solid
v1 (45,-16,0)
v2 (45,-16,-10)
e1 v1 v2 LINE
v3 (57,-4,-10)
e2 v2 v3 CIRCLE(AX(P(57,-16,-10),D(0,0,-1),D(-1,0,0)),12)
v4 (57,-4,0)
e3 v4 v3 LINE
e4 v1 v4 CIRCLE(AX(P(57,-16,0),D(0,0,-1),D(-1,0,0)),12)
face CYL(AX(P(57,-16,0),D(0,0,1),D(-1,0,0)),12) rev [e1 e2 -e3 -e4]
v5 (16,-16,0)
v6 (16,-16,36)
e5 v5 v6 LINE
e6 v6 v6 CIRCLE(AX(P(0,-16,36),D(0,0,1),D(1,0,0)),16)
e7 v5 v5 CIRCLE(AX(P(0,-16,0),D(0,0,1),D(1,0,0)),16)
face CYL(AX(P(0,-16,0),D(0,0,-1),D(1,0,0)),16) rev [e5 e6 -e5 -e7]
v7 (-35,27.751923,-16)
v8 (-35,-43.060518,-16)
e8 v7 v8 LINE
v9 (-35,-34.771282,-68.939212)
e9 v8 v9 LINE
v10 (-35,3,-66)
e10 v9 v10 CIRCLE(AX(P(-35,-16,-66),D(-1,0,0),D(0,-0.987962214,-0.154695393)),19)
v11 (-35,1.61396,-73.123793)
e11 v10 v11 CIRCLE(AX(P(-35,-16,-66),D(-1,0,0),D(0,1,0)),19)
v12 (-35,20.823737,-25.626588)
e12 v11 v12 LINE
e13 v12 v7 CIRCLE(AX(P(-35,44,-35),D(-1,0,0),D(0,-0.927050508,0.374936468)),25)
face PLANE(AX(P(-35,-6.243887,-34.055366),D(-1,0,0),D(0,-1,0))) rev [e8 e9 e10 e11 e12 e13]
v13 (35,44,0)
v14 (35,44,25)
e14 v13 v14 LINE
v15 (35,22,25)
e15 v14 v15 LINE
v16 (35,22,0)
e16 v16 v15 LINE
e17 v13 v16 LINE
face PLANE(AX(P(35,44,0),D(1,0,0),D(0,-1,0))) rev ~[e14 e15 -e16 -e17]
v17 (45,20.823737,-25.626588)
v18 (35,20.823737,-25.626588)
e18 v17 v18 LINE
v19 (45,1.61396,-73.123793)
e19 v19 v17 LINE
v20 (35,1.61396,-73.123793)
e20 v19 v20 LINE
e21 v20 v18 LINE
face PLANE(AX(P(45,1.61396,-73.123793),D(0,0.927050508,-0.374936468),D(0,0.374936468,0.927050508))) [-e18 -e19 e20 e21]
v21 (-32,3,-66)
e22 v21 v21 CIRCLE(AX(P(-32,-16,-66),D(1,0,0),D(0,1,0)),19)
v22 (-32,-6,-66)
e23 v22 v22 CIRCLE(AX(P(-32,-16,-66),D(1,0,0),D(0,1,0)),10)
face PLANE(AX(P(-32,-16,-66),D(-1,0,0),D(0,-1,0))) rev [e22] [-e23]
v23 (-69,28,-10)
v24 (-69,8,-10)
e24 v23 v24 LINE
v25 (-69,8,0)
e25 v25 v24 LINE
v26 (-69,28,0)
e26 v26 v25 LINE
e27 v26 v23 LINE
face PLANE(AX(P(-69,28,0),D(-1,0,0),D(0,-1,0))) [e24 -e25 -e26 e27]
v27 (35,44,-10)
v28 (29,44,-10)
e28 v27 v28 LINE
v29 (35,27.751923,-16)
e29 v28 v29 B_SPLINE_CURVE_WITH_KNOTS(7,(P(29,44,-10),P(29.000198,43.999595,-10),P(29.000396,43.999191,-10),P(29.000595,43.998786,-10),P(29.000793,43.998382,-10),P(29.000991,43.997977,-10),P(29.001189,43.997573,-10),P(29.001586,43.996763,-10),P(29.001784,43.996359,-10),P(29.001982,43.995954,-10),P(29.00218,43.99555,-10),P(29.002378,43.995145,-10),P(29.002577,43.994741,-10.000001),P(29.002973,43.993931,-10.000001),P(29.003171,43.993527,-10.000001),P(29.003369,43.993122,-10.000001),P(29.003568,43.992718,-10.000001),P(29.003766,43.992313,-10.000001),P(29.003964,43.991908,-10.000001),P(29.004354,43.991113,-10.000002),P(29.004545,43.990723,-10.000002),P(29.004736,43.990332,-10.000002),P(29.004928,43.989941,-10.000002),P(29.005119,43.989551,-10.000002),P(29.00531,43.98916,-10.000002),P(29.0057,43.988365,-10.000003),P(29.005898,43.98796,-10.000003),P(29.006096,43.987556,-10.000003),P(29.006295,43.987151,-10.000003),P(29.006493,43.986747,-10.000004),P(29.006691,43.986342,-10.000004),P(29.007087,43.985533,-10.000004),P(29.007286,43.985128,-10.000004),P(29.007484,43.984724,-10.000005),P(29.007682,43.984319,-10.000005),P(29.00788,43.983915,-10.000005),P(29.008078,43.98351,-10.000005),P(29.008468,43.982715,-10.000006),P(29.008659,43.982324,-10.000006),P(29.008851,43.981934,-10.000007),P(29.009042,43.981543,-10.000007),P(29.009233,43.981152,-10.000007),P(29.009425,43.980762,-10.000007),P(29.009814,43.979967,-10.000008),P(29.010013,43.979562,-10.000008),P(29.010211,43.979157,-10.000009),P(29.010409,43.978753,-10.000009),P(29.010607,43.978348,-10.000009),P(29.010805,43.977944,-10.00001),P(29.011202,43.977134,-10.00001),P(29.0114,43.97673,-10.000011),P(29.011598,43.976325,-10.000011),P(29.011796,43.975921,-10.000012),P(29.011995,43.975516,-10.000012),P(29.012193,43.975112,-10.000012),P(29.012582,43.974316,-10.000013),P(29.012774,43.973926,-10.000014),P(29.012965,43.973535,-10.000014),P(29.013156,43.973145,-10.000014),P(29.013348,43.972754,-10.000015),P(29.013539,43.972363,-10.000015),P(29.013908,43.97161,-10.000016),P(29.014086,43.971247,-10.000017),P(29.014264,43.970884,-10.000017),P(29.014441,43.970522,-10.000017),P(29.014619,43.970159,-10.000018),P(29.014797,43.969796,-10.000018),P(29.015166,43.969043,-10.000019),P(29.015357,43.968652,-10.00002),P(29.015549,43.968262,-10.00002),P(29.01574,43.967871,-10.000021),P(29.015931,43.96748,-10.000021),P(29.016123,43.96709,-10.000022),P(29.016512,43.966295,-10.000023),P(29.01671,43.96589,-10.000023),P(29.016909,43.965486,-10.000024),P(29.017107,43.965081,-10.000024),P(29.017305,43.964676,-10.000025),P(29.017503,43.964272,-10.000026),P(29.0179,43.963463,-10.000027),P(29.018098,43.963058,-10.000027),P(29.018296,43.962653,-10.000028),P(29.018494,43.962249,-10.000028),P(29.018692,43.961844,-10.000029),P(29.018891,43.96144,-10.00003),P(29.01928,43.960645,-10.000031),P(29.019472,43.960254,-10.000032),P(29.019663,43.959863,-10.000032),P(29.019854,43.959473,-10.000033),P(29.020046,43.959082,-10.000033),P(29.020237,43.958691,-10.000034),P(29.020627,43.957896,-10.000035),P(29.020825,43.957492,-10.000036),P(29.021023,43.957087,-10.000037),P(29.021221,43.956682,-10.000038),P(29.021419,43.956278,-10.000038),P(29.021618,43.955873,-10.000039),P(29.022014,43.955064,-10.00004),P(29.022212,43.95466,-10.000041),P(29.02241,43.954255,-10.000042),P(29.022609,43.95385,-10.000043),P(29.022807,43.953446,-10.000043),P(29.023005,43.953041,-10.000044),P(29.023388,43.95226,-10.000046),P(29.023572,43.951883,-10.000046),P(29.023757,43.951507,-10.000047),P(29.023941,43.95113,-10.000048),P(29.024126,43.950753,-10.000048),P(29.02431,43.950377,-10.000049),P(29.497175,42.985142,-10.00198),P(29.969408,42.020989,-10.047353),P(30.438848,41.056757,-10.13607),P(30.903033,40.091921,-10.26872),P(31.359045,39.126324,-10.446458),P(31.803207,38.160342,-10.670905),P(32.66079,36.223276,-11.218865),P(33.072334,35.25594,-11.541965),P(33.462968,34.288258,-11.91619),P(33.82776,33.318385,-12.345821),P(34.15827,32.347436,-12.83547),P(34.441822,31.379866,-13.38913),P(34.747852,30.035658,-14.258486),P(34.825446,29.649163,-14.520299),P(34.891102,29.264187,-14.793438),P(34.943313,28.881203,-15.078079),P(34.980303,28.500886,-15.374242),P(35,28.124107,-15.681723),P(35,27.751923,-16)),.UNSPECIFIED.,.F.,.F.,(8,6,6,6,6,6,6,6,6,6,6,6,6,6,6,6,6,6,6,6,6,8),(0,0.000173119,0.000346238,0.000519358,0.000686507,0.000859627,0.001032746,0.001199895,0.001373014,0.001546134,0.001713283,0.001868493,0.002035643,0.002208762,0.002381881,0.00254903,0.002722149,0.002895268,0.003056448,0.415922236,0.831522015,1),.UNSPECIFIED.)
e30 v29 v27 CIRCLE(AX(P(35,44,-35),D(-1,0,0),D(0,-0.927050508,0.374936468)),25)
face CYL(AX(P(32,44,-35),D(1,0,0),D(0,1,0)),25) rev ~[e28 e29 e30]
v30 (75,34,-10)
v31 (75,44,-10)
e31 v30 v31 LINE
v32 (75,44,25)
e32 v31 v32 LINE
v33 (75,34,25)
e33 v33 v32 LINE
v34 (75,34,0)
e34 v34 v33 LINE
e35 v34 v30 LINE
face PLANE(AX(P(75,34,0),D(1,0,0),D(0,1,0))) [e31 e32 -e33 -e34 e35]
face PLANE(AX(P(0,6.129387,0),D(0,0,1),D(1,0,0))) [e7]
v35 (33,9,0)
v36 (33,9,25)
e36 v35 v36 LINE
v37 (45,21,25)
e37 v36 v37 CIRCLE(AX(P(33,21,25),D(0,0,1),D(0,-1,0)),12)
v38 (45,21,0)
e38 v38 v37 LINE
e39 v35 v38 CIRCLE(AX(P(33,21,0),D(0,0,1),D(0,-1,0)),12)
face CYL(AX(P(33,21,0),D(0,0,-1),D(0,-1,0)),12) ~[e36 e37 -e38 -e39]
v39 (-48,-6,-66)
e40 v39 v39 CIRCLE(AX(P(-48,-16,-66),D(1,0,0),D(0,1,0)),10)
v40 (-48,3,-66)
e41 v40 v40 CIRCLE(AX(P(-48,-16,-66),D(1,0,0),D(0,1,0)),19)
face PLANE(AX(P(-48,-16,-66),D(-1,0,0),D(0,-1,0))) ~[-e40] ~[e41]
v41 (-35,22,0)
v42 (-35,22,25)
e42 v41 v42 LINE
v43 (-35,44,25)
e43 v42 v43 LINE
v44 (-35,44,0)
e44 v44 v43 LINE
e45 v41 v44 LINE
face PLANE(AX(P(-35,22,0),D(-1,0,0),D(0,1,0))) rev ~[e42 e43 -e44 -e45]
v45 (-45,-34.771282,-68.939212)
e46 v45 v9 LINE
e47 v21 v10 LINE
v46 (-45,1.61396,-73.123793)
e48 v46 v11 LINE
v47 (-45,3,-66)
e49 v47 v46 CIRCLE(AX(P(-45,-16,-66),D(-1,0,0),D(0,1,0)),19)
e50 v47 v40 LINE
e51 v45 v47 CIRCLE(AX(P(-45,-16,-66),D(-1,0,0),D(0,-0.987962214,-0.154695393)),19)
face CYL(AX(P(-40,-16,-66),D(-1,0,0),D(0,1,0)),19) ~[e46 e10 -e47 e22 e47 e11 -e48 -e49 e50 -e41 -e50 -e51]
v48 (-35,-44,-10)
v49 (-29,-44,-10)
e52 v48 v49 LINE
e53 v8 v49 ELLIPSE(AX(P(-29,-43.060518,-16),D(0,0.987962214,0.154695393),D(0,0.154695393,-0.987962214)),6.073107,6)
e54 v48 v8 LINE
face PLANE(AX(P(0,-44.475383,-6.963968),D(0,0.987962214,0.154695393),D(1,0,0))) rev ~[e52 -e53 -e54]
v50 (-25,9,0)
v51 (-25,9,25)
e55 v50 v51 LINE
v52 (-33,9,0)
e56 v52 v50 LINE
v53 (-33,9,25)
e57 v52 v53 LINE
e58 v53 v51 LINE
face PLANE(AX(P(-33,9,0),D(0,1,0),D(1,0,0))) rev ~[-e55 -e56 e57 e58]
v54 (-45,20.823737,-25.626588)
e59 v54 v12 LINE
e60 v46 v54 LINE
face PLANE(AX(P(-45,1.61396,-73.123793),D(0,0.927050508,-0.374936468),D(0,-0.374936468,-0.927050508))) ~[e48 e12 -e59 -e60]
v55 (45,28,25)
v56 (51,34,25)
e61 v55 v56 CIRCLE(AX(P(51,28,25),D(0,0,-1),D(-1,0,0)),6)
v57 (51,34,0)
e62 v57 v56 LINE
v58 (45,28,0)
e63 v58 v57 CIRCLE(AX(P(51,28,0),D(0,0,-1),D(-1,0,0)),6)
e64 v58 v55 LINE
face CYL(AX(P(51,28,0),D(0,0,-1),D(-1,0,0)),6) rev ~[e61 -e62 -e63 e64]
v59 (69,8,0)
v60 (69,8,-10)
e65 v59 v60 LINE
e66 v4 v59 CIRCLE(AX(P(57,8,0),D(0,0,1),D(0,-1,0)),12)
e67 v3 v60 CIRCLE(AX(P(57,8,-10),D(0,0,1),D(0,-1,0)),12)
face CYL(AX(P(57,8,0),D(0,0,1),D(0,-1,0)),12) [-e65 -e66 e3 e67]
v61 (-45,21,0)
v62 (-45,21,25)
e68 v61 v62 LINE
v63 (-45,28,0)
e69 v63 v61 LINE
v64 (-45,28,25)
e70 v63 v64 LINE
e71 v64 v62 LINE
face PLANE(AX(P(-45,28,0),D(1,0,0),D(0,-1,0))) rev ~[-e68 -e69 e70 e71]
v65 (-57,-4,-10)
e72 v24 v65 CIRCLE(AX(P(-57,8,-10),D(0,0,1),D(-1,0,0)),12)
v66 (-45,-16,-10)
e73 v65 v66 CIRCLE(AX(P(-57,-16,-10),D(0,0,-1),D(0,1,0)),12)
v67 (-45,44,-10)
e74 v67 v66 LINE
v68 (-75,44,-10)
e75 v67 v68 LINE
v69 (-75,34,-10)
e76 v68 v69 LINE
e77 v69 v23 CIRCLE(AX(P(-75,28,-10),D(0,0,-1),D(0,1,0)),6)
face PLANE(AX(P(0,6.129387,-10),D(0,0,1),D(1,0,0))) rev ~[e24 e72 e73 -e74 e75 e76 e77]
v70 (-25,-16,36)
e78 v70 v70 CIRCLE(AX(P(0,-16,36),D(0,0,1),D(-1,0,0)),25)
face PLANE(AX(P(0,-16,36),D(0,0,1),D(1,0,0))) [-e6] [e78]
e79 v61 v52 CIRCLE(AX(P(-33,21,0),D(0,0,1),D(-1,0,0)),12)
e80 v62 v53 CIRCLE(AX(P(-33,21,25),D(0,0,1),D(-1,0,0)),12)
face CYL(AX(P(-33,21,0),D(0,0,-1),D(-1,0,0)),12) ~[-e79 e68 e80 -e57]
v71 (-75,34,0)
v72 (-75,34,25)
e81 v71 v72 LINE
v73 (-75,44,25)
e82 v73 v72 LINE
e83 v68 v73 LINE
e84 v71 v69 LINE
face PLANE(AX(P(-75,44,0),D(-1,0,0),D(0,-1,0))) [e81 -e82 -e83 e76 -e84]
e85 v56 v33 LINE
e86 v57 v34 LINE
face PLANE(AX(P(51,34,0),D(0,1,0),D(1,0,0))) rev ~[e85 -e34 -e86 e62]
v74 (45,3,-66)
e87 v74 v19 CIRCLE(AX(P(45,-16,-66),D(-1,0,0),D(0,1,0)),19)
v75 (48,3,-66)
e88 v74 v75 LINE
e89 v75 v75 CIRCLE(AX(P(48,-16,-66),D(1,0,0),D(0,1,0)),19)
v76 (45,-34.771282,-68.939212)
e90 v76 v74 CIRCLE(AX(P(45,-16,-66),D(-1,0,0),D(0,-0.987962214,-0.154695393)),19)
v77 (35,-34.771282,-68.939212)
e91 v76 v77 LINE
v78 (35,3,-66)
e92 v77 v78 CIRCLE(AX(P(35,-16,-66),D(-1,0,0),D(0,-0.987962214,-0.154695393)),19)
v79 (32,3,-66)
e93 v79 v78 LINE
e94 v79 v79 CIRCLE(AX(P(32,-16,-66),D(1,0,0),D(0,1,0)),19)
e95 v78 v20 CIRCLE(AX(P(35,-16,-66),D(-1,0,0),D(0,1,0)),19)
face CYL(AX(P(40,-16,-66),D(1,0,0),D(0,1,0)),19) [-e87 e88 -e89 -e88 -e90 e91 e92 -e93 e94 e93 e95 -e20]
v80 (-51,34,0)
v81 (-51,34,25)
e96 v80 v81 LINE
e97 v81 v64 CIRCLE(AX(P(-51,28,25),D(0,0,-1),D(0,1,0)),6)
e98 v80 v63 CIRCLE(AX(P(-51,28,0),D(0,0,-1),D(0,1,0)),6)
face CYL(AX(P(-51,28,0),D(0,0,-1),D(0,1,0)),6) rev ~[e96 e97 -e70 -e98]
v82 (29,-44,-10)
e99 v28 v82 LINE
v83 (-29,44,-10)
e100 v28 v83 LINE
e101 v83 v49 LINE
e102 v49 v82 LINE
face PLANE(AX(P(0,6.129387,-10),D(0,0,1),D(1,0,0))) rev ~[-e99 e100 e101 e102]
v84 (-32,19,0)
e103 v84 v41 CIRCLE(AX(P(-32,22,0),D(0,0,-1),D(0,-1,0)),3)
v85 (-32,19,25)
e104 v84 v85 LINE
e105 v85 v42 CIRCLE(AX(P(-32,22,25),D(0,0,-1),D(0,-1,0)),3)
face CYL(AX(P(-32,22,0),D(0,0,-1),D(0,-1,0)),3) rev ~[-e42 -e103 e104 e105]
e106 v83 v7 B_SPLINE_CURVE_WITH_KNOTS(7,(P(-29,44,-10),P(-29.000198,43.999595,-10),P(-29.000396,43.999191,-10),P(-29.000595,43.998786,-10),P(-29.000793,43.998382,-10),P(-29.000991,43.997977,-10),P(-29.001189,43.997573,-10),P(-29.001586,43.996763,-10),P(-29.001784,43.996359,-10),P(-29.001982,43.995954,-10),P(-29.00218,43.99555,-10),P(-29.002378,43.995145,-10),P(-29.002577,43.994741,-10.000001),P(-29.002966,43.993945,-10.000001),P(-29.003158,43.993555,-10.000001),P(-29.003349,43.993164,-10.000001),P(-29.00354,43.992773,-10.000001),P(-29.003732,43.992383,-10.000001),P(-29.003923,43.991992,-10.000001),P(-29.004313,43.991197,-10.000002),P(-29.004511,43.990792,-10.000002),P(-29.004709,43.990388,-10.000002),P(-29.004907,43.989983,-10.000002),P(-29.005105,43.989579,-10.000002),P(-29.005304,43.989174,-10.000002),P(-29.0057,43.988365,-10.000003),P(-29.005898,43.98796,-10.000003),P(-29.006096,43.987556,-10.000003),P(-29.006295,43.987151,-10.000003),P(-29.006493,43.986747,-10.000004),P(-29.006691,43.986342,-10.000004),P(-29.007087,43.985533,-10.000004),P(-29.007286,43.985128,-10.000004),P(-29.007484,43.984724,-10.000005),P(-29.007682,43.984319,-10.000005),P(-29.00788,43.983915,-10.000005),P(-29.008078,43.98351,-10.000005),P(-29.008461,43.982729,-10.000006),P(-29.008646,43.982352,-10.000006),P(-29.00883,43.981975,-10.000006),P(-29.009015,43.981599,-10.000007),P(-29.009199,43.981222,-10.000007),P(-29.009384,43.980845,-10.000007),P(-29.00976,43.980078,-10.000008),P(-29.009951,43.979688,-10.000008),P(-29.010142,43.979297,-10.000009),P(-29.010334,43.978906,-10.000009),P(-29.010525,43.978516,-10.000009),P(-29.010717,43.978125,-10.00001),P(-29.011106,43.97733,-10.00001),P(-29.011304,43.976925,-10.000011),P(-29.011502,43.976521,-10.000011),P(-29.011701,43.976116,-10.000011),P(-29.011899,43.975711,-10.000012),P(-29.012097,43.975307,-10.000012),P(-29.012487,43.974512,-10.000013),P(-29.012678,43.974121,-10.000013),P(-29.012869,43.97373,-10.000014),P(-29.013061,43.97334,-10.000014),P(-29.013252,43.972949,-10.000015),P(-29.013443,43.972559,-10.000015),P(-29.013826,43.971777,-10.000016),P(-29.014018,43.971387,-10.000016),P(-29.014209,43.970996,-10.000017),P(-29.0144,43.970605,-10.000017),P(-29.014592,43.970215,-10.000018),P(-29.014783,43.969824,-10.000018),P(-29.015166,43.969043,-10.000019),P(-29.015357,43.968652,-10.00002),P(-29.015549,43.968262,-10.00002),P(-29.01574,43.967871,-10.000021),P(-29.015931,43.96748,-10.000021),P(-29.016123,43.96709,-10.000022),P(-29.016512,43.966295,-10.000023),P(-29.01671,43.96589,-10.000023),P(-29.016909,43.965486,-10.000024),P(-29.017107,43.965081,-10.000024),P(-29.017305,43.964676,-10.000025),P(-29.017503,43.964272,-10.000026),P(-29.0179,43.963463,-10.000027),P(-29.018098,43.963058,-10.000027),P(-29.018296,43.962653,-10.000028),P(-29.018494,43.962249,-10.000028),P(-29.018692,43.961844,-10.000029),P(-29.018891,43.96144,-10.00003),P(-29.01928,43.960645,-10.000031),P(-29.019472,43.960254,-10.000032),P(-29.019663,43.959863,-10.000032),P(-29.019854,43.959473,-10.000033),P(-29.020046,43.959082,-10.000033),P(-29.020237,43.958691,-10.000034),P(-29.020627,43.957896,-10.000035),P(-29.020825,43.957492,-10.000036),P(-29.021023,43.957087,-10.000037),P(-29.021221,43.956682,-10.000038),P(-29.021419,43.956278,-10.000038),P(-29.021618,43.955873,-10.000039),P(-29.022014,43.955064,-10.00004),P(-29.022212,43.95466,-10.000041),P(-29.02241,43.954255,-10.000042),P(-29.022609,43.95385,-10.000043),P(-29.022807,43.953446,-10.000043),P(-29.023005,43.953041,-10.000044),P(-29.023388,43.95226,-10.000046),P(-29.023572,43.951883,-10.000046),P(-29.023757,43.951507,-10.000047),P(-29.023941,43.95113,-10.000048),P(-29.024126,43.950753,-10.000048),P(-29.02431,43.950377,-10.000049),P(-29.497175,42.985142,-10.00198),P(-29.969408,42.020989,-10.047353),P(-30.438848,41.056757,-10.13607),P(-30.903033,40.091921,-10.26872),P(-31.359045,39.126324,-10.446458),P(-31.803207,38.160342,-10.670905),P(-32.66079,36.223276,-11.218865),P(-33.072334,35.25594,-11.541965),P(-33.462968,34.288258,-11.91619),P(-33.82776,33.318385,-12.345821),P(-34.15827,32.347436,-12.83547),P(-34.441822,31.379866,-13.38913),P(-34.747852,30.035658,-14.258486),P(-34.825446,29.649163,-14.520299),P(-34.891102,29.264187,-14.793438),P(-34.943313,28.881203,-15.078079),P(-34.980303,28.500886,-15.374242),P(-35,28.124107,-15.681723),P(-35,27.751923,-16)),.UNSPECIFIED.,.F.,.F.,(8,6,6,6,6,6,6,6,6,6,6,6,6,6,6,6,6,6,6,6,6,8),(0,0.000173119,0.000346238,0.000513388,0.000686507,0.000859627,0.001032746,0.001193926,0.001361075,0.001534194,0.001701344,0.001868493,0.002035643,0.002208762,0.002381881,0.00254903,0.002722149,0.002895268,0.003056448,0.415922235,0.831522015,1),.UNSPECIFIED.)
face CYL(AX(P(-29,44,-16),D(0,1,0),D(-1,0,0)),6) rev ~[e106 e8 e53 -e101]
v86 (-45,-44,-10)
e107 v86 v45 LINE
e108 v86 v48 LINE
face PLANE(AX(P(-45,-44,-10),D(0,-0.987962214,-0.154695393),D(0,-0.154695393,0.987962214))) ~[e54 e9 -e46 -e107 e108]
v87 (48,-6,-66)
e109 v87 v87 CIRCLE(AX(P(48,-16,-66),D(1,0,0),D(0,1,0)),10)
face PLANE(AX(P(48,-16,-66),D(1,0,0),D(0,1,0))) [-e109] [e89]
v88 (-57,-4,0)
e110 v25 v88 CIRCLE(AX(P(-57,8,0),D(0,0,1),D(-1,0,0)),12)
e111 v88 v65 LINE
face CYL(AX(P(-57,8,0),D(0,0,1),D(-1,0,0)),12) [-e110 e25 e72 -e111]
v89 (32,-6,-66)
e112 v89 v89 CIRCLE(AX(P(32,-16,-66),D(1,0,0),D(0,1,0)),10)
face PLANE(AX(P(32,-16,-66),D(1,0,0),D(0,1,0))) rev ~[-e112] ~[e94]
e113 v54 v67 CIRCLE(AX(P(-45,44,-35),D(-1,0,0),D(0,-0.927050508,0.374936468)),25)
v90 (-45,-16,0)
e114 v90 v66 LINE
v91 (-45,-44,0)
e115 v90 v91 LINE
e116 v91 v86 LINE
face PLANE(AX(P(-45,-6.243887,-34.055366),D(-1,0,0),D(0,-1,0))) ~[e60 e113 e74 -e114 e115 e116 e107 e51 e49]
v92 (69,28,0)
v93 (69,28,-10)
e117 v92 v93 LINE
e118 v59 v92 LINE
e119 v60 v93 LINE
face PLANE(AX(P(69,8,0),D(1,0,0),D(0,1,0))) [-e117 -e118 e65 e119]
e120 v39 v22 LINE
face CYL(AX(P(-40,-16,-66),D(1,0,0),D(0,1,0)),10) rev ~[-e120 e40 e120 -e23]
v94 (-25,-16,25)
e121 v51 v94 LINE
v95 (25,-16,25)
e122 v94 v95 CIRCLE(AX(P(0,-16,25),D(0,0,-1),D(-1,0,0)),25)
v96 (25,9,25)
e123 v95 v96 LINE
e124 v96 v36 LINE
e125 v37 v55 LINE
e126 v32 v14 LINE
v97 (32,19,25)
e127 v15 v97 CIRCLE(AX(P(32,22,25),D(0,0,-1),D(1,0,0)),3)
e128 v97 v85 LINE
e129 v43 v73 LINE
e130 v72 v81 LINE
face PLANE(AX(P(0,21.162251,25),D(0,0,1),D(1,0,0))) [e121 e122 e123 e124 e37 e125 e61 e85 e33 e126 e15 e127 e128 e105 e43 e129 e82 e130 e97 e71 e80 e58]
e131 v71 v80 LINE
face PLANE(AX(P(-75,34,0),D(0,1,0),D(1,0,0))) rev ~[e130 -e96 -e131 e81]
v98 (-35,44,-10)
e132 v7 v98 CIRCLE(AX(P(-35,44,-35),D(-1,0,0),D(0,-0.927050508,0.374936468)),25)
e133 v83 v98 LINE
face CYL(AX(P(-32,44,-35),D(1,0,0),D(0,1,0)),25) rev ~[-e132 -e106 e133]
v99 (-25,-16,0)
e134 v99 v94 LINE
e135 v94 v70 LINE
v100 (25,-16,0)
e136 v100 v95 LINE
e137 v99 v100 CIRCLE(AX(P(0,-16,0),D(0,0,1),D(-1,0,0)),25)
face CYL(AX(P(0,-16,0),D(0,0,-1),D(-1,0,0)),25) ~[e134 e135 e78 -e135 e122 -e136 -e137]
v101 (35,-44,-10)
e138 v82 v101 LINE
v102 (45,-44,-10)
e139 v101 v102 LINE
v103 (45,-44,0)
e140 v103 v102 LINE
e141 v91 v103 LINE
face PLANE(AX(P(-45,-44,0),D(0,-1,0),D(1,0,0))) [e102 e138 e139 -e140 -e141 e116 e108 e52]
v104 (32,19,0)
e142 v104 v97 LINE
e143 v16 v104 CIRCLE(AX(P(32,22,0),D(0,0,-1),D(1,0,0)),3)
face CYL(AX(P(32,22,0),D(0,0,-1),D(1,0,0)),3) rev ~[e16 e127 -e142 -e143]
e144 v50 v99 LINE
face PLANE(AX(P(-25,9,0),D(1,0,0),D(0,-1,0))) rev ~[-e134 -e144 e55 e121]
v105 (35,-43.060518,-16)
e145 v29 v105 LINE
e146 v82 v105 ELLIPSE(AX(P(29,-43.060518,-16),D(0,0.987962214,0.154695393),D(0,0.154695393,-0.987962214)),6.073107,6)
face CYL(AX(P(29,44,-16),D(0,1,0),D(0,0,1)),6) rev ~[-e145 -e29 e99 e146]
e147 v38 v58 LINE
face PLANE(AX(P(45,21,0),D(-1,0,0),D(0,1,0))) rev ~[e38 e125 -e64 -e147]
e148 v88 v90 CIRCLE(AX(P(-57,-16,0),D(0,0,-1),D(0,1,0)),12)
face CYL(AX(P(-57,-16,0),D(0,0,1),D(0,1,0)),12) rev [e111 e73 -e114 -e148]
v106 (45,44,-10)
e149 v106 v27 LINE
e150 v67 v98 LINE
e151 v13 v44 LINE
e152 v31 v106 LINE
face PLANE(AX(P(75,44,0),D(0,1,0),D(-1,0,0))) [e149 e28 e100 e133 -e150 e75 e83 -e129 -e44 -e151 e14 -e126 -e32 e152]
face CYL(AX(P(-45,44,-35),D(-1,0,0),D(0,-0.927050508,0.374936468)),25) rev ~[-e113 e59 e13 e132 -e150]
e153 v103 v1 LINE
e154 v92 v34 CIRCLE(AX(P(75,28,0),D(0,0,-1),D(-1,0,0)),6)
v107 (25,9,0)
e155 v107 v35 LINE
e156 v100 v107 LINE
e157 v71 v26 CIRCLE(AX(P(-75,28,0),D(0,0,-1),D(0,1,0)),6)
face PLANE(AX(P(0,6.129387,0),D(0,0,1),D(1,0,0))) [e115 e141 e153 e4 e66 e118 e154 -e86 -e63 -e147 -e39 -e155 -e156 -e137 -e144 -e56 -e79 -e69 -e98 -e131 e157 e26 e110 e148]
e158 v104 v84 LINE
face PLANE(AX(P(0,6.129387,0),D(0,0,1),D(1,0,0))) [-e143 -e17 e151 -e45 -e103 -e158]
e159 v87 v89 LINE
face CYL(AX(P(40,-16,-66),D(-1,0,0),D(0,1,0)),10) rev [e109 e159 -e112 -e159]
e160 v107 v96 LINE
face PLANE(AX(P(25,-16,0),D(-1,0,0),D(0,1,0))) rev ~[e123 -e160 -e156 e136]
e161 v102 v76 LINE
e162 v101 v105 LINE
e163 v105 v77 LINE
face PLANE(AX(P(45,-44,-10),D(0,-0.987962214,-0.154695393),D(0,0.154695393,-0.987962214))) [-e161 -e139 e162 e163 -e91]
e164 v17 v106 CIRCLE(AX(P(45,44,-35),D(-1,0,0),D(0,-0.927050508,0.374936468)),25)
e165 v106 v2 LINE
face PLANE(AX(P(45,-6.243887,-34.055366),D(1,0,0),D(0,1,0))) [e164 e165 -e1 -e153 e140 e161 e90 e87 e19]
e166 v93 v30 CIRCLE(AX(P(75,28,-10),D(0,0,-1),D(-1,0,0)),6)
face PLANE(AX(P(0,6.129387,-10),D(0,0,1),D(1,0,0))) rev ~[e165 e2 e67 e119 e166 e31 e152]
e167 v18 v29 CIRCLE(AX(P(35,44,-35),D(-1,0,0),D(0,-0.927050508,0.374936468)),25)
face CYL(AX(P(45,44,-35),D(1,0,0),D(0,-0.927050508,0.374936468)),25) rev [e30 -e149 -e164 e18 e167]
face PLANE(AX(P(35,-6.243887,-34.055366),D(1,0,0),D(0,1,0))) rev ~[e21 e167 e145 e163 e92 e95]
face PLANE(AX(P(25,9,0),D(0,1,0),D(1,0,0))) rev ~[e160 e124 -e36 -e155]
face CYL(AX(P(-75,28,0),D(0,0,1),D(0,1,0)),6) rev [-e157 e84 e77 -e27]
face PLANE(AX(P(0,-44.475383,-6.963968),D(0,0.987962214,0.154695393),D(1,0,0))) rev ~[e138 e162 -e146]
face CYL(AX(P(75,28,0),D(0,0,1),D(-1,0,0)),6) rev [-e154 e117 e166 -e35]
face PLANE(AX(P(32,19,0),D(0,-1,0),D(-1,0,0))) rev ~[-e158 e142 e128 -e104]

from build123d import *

# Parameters (mm, degrees)
F1_DEPTH      = 25
F0_R          = 16
F2_DEPTH      = 36
F4_DEPTH      = 10
F6_DEPTH      = 10
F8_R          = 19
F8_R_2        = 10
F9_DEPTH      = 8
F10_T4_DEPTH  = 103
F10_S6_R      = 25
F10_T7_DEPTH  = 53
F10_T11_DEPTH = 103
F10_S13_R     = 25
F10_T14_DEPTH = 53


# Not quite as in the source:
# - a fillet or chamfer that OpenCascade refuses, or shapes differently, is made with other operations: its cross-section is extruded or revolved along the edge and cut away or added
# - a pattern or mirror of a feature is missing from the dataset's text; its kind, count and spacing are read off the source's solid


with BuildPart() as f1:
    # F0 (on Top) → F1 (new body)
    with BuildSketch(Plane.XY):
        with BuildLine():
            Line((-35, 44), (-75, 44))
            Line((-75, 44), (-75, 34))
            Line((-75, 34), (-51, 34))
            ThreePointArc((-51, 34), (-46.7573593129, 32.2426406871), (-45, 28))
            Line((-45, 28), (-45, 21))
            ThreePointArc((-45, 21), (-41.4852813742, 12.5147186258), (-33, 9))
            Line((-33, 9), (-25, 9))
            Line((-25, 9), (-25, -16))
            ThreePointArc((-25, -16), (0, 9), (25, -16))
            Line((25, -16), (25, 9))
            Line((25, 9), (33, 9))
            ThreePointArc((33, 9), (41.4852813742, 12.5147186258), (45, 21))
            Line((45, 21), (45, 28))
            ThreePointArc((45, 28), (46.7573593129, 32.2426406871), (51, 34))
            Line((51, 34), (75, 34))
            Line((75, 34), (75, 44))
            Line((75, 44), (35, 44))
            Line((35, 44), (35, 34))
            Line((35, 34), (35, 22))
            ThreePointArc((35, 22), (34.1213203436, 19.8786796564), (32, 19))
            Line((32, 19), (-32, 19))
            ThreePointArc((-32, 19), (-34.1213203436, 19.8786796564), (-35, 22))
            Line((-35, 22), (-35, 34))
            Line((-35, 34), (-35, 44))
        make_face()
    extrude(amount=F1_DEPTH)

    # F0 (on Top) → F2 (join)
    with BuildSketch(Plane.XY):
        with BuildLine():
            ThreePointArc((25, -16), (0, 9), (-25, -16))
            ThreePointArc((-25, -16), (0, -41), (25, -16))
        make_face()
        with Locations((0, -16)):
            Circle(F0_R, mode=Mode.SUBTRACT)
    extrude(amount=F2_DEPTH)

    # F3 (on face) → F4 (join)
    with BuildSketch(Plane.XY):
        with BuildLine():
            Line((75, 34), (75, 44))
            Line((75, 44), (-75, 44))
            Line((-75, 44), (-75, 34))
            ThreePointArc((-75, 34), (-70.7573593129, 32.2426406871), (-69, 28))
            Line((-69, 28), (-69, 8))
            ThreePointArc((-69, 8), (-65.4852813742, -0.4852813742), (-57, -4))
            ThreePointArc((-57, -4), (-48.5147186258, -7.5147186258), (-45, -16))
            Line((-45, -16), (-45, -44))
            Line((-45, -44), (45, -44))
            Line((45, -44), (45, -16))
            ThreePointArc((45, -16), (48.5147186258, -7.5147186258), (57, -4))
            ThreePointArc((57, -4), (65.4852813742, -0.4852813742), (69, 8))
            Line((69, 8), (69, 28))
            ThreePointArc((69, 28), (70.7573593129, 32.2426406871), (75, 34))
        make_face()
    extrude(amount=-F4_DEPTH)

    # F5 (on face) → F6 (join)
    with BuildSketch(Plane.YZ.offset(45)):
        with BuildLine():
            ThreePointArc((-34.7712820587, -68.9392124579), (-17.4740489959, -47.0572657845), (3, -66))
            ThreePointArc((3, -66), (2.6502712249, -69.6286889144), (1.6139596592, -73.1237928888))
            Line((1.6139596592, -73.1237928888), (20.8237372905, -25.6265883042))
            ThreePointArc((20.8237372905, -25.6265883042), (30.0238648475, -14.2715739575), (44, -10))
            Line((44, -10), (34, -10))
            Line((34, -10), (-16, -10))
            Line((-16, -10), (-44, -10))
            Line((-44, -10), (-34.7712820587, -68.9392124579))
        make_face()
    f6 = extrude(amount=-F6_DEPTH)

    # F6_copies: F6 across plane
    add(f6.mirror(Plane(origin=(0, 0, 0), x_dir=(0, 0, -1), z_dir=(-1, 0, 0))))

    # F8 (on face) → F9 (join, symmetric)
    with BuildSketch(Plane.YZ.offset(40)):
        with Locations((-16, -66)):
            Circle(F8_R)
        with Locations((-16, -66)):
            Circle(F8_R_2, mode=Mode.SUBTRACT)
    f9 = extrude(amount=F9_DEPTH, both=True)

    # F9_copies: F9 across plane
    add(f9.mirror(Plane(origin=(0, 0, 0), x_dir=(0, 0, -1), z_dir=(-1, 0, 0))))

    # F10: fillet of radius 6 on 2 edges, made by hand


with BuildPart() as f10_tool2:
    # F10_s3 → F10_t4 (new body)
    with BuildSketch(Plane.XZ.offset(-44)):
        with BuildLine():
            ThreePointArc((29, -10), (33.2426406871, -11.7573593129), (35, -16))
            Line((35, -16), (35, -10))
            Line((35, -10), (29, -10))
        make_face()
    extrude(amount=F10_T4_DEPTH)

    split(bisect_by=Plane(origin=(0, -44.4753827877, -6.9639675517), x_dir=(1, 0, 0), z_dir=(0, 0.9879622136, 0.1546953925)), keep=Keep.TOP)

    # F10_s6 → F10_t7 (cut, symmetric)
    with BuildSketch(Plane.YZ.offset(32)):
        with Locations((44, -35)):
            Circle(F10_S6_R)
    extrude(amount=F10_T7_DEPTH, both=True, mode=Mode.SUBTRACT)


with BuildPart() as f1_1:
    add(f1.part)

    # F10_t1: union F10_tool2
    add(f10_tool2.part)


with BuildPart() as f10_tool9:
    # F10_s10 → F10_t11 (new body)
    with BuildSketch(Plane.XZ.offset(-44)):
        with BuildLine():
            ThreePointArc((-35, -16), (-33.2426406871, -11.7573593129), (-29, -10))
            Line((-29, -10), (-35, -10))
            Line((-35, -10), (-35, -16))
        make_face()
    extrude(amount=F10_T11_DEPTH)

    split(bisect_by=Plane(origin=(0, -44.4753827877, -6.9639675517), x_dir=(1, 0, 0), z_dir=(0, 0.9879622136, 0.1546953925)), keep=Keep.TOP)

    # F10_s13 → F10_t14 (cut, symmetric)
    with BuildSketch(Plane.YZ.offset(-32)):
        with Locations((44, -35)):
            Circle(F10_S13_R)
    extrude(amount=F10_T14_DEPTH, both=True, mode=Mode.SUBTRACT)


with BuildPart() as f1_2:
    add(f1_1.part)

    # F10_t8: union F10_tool9
    add(f10_tool9.part)


solid = f1_2.part
